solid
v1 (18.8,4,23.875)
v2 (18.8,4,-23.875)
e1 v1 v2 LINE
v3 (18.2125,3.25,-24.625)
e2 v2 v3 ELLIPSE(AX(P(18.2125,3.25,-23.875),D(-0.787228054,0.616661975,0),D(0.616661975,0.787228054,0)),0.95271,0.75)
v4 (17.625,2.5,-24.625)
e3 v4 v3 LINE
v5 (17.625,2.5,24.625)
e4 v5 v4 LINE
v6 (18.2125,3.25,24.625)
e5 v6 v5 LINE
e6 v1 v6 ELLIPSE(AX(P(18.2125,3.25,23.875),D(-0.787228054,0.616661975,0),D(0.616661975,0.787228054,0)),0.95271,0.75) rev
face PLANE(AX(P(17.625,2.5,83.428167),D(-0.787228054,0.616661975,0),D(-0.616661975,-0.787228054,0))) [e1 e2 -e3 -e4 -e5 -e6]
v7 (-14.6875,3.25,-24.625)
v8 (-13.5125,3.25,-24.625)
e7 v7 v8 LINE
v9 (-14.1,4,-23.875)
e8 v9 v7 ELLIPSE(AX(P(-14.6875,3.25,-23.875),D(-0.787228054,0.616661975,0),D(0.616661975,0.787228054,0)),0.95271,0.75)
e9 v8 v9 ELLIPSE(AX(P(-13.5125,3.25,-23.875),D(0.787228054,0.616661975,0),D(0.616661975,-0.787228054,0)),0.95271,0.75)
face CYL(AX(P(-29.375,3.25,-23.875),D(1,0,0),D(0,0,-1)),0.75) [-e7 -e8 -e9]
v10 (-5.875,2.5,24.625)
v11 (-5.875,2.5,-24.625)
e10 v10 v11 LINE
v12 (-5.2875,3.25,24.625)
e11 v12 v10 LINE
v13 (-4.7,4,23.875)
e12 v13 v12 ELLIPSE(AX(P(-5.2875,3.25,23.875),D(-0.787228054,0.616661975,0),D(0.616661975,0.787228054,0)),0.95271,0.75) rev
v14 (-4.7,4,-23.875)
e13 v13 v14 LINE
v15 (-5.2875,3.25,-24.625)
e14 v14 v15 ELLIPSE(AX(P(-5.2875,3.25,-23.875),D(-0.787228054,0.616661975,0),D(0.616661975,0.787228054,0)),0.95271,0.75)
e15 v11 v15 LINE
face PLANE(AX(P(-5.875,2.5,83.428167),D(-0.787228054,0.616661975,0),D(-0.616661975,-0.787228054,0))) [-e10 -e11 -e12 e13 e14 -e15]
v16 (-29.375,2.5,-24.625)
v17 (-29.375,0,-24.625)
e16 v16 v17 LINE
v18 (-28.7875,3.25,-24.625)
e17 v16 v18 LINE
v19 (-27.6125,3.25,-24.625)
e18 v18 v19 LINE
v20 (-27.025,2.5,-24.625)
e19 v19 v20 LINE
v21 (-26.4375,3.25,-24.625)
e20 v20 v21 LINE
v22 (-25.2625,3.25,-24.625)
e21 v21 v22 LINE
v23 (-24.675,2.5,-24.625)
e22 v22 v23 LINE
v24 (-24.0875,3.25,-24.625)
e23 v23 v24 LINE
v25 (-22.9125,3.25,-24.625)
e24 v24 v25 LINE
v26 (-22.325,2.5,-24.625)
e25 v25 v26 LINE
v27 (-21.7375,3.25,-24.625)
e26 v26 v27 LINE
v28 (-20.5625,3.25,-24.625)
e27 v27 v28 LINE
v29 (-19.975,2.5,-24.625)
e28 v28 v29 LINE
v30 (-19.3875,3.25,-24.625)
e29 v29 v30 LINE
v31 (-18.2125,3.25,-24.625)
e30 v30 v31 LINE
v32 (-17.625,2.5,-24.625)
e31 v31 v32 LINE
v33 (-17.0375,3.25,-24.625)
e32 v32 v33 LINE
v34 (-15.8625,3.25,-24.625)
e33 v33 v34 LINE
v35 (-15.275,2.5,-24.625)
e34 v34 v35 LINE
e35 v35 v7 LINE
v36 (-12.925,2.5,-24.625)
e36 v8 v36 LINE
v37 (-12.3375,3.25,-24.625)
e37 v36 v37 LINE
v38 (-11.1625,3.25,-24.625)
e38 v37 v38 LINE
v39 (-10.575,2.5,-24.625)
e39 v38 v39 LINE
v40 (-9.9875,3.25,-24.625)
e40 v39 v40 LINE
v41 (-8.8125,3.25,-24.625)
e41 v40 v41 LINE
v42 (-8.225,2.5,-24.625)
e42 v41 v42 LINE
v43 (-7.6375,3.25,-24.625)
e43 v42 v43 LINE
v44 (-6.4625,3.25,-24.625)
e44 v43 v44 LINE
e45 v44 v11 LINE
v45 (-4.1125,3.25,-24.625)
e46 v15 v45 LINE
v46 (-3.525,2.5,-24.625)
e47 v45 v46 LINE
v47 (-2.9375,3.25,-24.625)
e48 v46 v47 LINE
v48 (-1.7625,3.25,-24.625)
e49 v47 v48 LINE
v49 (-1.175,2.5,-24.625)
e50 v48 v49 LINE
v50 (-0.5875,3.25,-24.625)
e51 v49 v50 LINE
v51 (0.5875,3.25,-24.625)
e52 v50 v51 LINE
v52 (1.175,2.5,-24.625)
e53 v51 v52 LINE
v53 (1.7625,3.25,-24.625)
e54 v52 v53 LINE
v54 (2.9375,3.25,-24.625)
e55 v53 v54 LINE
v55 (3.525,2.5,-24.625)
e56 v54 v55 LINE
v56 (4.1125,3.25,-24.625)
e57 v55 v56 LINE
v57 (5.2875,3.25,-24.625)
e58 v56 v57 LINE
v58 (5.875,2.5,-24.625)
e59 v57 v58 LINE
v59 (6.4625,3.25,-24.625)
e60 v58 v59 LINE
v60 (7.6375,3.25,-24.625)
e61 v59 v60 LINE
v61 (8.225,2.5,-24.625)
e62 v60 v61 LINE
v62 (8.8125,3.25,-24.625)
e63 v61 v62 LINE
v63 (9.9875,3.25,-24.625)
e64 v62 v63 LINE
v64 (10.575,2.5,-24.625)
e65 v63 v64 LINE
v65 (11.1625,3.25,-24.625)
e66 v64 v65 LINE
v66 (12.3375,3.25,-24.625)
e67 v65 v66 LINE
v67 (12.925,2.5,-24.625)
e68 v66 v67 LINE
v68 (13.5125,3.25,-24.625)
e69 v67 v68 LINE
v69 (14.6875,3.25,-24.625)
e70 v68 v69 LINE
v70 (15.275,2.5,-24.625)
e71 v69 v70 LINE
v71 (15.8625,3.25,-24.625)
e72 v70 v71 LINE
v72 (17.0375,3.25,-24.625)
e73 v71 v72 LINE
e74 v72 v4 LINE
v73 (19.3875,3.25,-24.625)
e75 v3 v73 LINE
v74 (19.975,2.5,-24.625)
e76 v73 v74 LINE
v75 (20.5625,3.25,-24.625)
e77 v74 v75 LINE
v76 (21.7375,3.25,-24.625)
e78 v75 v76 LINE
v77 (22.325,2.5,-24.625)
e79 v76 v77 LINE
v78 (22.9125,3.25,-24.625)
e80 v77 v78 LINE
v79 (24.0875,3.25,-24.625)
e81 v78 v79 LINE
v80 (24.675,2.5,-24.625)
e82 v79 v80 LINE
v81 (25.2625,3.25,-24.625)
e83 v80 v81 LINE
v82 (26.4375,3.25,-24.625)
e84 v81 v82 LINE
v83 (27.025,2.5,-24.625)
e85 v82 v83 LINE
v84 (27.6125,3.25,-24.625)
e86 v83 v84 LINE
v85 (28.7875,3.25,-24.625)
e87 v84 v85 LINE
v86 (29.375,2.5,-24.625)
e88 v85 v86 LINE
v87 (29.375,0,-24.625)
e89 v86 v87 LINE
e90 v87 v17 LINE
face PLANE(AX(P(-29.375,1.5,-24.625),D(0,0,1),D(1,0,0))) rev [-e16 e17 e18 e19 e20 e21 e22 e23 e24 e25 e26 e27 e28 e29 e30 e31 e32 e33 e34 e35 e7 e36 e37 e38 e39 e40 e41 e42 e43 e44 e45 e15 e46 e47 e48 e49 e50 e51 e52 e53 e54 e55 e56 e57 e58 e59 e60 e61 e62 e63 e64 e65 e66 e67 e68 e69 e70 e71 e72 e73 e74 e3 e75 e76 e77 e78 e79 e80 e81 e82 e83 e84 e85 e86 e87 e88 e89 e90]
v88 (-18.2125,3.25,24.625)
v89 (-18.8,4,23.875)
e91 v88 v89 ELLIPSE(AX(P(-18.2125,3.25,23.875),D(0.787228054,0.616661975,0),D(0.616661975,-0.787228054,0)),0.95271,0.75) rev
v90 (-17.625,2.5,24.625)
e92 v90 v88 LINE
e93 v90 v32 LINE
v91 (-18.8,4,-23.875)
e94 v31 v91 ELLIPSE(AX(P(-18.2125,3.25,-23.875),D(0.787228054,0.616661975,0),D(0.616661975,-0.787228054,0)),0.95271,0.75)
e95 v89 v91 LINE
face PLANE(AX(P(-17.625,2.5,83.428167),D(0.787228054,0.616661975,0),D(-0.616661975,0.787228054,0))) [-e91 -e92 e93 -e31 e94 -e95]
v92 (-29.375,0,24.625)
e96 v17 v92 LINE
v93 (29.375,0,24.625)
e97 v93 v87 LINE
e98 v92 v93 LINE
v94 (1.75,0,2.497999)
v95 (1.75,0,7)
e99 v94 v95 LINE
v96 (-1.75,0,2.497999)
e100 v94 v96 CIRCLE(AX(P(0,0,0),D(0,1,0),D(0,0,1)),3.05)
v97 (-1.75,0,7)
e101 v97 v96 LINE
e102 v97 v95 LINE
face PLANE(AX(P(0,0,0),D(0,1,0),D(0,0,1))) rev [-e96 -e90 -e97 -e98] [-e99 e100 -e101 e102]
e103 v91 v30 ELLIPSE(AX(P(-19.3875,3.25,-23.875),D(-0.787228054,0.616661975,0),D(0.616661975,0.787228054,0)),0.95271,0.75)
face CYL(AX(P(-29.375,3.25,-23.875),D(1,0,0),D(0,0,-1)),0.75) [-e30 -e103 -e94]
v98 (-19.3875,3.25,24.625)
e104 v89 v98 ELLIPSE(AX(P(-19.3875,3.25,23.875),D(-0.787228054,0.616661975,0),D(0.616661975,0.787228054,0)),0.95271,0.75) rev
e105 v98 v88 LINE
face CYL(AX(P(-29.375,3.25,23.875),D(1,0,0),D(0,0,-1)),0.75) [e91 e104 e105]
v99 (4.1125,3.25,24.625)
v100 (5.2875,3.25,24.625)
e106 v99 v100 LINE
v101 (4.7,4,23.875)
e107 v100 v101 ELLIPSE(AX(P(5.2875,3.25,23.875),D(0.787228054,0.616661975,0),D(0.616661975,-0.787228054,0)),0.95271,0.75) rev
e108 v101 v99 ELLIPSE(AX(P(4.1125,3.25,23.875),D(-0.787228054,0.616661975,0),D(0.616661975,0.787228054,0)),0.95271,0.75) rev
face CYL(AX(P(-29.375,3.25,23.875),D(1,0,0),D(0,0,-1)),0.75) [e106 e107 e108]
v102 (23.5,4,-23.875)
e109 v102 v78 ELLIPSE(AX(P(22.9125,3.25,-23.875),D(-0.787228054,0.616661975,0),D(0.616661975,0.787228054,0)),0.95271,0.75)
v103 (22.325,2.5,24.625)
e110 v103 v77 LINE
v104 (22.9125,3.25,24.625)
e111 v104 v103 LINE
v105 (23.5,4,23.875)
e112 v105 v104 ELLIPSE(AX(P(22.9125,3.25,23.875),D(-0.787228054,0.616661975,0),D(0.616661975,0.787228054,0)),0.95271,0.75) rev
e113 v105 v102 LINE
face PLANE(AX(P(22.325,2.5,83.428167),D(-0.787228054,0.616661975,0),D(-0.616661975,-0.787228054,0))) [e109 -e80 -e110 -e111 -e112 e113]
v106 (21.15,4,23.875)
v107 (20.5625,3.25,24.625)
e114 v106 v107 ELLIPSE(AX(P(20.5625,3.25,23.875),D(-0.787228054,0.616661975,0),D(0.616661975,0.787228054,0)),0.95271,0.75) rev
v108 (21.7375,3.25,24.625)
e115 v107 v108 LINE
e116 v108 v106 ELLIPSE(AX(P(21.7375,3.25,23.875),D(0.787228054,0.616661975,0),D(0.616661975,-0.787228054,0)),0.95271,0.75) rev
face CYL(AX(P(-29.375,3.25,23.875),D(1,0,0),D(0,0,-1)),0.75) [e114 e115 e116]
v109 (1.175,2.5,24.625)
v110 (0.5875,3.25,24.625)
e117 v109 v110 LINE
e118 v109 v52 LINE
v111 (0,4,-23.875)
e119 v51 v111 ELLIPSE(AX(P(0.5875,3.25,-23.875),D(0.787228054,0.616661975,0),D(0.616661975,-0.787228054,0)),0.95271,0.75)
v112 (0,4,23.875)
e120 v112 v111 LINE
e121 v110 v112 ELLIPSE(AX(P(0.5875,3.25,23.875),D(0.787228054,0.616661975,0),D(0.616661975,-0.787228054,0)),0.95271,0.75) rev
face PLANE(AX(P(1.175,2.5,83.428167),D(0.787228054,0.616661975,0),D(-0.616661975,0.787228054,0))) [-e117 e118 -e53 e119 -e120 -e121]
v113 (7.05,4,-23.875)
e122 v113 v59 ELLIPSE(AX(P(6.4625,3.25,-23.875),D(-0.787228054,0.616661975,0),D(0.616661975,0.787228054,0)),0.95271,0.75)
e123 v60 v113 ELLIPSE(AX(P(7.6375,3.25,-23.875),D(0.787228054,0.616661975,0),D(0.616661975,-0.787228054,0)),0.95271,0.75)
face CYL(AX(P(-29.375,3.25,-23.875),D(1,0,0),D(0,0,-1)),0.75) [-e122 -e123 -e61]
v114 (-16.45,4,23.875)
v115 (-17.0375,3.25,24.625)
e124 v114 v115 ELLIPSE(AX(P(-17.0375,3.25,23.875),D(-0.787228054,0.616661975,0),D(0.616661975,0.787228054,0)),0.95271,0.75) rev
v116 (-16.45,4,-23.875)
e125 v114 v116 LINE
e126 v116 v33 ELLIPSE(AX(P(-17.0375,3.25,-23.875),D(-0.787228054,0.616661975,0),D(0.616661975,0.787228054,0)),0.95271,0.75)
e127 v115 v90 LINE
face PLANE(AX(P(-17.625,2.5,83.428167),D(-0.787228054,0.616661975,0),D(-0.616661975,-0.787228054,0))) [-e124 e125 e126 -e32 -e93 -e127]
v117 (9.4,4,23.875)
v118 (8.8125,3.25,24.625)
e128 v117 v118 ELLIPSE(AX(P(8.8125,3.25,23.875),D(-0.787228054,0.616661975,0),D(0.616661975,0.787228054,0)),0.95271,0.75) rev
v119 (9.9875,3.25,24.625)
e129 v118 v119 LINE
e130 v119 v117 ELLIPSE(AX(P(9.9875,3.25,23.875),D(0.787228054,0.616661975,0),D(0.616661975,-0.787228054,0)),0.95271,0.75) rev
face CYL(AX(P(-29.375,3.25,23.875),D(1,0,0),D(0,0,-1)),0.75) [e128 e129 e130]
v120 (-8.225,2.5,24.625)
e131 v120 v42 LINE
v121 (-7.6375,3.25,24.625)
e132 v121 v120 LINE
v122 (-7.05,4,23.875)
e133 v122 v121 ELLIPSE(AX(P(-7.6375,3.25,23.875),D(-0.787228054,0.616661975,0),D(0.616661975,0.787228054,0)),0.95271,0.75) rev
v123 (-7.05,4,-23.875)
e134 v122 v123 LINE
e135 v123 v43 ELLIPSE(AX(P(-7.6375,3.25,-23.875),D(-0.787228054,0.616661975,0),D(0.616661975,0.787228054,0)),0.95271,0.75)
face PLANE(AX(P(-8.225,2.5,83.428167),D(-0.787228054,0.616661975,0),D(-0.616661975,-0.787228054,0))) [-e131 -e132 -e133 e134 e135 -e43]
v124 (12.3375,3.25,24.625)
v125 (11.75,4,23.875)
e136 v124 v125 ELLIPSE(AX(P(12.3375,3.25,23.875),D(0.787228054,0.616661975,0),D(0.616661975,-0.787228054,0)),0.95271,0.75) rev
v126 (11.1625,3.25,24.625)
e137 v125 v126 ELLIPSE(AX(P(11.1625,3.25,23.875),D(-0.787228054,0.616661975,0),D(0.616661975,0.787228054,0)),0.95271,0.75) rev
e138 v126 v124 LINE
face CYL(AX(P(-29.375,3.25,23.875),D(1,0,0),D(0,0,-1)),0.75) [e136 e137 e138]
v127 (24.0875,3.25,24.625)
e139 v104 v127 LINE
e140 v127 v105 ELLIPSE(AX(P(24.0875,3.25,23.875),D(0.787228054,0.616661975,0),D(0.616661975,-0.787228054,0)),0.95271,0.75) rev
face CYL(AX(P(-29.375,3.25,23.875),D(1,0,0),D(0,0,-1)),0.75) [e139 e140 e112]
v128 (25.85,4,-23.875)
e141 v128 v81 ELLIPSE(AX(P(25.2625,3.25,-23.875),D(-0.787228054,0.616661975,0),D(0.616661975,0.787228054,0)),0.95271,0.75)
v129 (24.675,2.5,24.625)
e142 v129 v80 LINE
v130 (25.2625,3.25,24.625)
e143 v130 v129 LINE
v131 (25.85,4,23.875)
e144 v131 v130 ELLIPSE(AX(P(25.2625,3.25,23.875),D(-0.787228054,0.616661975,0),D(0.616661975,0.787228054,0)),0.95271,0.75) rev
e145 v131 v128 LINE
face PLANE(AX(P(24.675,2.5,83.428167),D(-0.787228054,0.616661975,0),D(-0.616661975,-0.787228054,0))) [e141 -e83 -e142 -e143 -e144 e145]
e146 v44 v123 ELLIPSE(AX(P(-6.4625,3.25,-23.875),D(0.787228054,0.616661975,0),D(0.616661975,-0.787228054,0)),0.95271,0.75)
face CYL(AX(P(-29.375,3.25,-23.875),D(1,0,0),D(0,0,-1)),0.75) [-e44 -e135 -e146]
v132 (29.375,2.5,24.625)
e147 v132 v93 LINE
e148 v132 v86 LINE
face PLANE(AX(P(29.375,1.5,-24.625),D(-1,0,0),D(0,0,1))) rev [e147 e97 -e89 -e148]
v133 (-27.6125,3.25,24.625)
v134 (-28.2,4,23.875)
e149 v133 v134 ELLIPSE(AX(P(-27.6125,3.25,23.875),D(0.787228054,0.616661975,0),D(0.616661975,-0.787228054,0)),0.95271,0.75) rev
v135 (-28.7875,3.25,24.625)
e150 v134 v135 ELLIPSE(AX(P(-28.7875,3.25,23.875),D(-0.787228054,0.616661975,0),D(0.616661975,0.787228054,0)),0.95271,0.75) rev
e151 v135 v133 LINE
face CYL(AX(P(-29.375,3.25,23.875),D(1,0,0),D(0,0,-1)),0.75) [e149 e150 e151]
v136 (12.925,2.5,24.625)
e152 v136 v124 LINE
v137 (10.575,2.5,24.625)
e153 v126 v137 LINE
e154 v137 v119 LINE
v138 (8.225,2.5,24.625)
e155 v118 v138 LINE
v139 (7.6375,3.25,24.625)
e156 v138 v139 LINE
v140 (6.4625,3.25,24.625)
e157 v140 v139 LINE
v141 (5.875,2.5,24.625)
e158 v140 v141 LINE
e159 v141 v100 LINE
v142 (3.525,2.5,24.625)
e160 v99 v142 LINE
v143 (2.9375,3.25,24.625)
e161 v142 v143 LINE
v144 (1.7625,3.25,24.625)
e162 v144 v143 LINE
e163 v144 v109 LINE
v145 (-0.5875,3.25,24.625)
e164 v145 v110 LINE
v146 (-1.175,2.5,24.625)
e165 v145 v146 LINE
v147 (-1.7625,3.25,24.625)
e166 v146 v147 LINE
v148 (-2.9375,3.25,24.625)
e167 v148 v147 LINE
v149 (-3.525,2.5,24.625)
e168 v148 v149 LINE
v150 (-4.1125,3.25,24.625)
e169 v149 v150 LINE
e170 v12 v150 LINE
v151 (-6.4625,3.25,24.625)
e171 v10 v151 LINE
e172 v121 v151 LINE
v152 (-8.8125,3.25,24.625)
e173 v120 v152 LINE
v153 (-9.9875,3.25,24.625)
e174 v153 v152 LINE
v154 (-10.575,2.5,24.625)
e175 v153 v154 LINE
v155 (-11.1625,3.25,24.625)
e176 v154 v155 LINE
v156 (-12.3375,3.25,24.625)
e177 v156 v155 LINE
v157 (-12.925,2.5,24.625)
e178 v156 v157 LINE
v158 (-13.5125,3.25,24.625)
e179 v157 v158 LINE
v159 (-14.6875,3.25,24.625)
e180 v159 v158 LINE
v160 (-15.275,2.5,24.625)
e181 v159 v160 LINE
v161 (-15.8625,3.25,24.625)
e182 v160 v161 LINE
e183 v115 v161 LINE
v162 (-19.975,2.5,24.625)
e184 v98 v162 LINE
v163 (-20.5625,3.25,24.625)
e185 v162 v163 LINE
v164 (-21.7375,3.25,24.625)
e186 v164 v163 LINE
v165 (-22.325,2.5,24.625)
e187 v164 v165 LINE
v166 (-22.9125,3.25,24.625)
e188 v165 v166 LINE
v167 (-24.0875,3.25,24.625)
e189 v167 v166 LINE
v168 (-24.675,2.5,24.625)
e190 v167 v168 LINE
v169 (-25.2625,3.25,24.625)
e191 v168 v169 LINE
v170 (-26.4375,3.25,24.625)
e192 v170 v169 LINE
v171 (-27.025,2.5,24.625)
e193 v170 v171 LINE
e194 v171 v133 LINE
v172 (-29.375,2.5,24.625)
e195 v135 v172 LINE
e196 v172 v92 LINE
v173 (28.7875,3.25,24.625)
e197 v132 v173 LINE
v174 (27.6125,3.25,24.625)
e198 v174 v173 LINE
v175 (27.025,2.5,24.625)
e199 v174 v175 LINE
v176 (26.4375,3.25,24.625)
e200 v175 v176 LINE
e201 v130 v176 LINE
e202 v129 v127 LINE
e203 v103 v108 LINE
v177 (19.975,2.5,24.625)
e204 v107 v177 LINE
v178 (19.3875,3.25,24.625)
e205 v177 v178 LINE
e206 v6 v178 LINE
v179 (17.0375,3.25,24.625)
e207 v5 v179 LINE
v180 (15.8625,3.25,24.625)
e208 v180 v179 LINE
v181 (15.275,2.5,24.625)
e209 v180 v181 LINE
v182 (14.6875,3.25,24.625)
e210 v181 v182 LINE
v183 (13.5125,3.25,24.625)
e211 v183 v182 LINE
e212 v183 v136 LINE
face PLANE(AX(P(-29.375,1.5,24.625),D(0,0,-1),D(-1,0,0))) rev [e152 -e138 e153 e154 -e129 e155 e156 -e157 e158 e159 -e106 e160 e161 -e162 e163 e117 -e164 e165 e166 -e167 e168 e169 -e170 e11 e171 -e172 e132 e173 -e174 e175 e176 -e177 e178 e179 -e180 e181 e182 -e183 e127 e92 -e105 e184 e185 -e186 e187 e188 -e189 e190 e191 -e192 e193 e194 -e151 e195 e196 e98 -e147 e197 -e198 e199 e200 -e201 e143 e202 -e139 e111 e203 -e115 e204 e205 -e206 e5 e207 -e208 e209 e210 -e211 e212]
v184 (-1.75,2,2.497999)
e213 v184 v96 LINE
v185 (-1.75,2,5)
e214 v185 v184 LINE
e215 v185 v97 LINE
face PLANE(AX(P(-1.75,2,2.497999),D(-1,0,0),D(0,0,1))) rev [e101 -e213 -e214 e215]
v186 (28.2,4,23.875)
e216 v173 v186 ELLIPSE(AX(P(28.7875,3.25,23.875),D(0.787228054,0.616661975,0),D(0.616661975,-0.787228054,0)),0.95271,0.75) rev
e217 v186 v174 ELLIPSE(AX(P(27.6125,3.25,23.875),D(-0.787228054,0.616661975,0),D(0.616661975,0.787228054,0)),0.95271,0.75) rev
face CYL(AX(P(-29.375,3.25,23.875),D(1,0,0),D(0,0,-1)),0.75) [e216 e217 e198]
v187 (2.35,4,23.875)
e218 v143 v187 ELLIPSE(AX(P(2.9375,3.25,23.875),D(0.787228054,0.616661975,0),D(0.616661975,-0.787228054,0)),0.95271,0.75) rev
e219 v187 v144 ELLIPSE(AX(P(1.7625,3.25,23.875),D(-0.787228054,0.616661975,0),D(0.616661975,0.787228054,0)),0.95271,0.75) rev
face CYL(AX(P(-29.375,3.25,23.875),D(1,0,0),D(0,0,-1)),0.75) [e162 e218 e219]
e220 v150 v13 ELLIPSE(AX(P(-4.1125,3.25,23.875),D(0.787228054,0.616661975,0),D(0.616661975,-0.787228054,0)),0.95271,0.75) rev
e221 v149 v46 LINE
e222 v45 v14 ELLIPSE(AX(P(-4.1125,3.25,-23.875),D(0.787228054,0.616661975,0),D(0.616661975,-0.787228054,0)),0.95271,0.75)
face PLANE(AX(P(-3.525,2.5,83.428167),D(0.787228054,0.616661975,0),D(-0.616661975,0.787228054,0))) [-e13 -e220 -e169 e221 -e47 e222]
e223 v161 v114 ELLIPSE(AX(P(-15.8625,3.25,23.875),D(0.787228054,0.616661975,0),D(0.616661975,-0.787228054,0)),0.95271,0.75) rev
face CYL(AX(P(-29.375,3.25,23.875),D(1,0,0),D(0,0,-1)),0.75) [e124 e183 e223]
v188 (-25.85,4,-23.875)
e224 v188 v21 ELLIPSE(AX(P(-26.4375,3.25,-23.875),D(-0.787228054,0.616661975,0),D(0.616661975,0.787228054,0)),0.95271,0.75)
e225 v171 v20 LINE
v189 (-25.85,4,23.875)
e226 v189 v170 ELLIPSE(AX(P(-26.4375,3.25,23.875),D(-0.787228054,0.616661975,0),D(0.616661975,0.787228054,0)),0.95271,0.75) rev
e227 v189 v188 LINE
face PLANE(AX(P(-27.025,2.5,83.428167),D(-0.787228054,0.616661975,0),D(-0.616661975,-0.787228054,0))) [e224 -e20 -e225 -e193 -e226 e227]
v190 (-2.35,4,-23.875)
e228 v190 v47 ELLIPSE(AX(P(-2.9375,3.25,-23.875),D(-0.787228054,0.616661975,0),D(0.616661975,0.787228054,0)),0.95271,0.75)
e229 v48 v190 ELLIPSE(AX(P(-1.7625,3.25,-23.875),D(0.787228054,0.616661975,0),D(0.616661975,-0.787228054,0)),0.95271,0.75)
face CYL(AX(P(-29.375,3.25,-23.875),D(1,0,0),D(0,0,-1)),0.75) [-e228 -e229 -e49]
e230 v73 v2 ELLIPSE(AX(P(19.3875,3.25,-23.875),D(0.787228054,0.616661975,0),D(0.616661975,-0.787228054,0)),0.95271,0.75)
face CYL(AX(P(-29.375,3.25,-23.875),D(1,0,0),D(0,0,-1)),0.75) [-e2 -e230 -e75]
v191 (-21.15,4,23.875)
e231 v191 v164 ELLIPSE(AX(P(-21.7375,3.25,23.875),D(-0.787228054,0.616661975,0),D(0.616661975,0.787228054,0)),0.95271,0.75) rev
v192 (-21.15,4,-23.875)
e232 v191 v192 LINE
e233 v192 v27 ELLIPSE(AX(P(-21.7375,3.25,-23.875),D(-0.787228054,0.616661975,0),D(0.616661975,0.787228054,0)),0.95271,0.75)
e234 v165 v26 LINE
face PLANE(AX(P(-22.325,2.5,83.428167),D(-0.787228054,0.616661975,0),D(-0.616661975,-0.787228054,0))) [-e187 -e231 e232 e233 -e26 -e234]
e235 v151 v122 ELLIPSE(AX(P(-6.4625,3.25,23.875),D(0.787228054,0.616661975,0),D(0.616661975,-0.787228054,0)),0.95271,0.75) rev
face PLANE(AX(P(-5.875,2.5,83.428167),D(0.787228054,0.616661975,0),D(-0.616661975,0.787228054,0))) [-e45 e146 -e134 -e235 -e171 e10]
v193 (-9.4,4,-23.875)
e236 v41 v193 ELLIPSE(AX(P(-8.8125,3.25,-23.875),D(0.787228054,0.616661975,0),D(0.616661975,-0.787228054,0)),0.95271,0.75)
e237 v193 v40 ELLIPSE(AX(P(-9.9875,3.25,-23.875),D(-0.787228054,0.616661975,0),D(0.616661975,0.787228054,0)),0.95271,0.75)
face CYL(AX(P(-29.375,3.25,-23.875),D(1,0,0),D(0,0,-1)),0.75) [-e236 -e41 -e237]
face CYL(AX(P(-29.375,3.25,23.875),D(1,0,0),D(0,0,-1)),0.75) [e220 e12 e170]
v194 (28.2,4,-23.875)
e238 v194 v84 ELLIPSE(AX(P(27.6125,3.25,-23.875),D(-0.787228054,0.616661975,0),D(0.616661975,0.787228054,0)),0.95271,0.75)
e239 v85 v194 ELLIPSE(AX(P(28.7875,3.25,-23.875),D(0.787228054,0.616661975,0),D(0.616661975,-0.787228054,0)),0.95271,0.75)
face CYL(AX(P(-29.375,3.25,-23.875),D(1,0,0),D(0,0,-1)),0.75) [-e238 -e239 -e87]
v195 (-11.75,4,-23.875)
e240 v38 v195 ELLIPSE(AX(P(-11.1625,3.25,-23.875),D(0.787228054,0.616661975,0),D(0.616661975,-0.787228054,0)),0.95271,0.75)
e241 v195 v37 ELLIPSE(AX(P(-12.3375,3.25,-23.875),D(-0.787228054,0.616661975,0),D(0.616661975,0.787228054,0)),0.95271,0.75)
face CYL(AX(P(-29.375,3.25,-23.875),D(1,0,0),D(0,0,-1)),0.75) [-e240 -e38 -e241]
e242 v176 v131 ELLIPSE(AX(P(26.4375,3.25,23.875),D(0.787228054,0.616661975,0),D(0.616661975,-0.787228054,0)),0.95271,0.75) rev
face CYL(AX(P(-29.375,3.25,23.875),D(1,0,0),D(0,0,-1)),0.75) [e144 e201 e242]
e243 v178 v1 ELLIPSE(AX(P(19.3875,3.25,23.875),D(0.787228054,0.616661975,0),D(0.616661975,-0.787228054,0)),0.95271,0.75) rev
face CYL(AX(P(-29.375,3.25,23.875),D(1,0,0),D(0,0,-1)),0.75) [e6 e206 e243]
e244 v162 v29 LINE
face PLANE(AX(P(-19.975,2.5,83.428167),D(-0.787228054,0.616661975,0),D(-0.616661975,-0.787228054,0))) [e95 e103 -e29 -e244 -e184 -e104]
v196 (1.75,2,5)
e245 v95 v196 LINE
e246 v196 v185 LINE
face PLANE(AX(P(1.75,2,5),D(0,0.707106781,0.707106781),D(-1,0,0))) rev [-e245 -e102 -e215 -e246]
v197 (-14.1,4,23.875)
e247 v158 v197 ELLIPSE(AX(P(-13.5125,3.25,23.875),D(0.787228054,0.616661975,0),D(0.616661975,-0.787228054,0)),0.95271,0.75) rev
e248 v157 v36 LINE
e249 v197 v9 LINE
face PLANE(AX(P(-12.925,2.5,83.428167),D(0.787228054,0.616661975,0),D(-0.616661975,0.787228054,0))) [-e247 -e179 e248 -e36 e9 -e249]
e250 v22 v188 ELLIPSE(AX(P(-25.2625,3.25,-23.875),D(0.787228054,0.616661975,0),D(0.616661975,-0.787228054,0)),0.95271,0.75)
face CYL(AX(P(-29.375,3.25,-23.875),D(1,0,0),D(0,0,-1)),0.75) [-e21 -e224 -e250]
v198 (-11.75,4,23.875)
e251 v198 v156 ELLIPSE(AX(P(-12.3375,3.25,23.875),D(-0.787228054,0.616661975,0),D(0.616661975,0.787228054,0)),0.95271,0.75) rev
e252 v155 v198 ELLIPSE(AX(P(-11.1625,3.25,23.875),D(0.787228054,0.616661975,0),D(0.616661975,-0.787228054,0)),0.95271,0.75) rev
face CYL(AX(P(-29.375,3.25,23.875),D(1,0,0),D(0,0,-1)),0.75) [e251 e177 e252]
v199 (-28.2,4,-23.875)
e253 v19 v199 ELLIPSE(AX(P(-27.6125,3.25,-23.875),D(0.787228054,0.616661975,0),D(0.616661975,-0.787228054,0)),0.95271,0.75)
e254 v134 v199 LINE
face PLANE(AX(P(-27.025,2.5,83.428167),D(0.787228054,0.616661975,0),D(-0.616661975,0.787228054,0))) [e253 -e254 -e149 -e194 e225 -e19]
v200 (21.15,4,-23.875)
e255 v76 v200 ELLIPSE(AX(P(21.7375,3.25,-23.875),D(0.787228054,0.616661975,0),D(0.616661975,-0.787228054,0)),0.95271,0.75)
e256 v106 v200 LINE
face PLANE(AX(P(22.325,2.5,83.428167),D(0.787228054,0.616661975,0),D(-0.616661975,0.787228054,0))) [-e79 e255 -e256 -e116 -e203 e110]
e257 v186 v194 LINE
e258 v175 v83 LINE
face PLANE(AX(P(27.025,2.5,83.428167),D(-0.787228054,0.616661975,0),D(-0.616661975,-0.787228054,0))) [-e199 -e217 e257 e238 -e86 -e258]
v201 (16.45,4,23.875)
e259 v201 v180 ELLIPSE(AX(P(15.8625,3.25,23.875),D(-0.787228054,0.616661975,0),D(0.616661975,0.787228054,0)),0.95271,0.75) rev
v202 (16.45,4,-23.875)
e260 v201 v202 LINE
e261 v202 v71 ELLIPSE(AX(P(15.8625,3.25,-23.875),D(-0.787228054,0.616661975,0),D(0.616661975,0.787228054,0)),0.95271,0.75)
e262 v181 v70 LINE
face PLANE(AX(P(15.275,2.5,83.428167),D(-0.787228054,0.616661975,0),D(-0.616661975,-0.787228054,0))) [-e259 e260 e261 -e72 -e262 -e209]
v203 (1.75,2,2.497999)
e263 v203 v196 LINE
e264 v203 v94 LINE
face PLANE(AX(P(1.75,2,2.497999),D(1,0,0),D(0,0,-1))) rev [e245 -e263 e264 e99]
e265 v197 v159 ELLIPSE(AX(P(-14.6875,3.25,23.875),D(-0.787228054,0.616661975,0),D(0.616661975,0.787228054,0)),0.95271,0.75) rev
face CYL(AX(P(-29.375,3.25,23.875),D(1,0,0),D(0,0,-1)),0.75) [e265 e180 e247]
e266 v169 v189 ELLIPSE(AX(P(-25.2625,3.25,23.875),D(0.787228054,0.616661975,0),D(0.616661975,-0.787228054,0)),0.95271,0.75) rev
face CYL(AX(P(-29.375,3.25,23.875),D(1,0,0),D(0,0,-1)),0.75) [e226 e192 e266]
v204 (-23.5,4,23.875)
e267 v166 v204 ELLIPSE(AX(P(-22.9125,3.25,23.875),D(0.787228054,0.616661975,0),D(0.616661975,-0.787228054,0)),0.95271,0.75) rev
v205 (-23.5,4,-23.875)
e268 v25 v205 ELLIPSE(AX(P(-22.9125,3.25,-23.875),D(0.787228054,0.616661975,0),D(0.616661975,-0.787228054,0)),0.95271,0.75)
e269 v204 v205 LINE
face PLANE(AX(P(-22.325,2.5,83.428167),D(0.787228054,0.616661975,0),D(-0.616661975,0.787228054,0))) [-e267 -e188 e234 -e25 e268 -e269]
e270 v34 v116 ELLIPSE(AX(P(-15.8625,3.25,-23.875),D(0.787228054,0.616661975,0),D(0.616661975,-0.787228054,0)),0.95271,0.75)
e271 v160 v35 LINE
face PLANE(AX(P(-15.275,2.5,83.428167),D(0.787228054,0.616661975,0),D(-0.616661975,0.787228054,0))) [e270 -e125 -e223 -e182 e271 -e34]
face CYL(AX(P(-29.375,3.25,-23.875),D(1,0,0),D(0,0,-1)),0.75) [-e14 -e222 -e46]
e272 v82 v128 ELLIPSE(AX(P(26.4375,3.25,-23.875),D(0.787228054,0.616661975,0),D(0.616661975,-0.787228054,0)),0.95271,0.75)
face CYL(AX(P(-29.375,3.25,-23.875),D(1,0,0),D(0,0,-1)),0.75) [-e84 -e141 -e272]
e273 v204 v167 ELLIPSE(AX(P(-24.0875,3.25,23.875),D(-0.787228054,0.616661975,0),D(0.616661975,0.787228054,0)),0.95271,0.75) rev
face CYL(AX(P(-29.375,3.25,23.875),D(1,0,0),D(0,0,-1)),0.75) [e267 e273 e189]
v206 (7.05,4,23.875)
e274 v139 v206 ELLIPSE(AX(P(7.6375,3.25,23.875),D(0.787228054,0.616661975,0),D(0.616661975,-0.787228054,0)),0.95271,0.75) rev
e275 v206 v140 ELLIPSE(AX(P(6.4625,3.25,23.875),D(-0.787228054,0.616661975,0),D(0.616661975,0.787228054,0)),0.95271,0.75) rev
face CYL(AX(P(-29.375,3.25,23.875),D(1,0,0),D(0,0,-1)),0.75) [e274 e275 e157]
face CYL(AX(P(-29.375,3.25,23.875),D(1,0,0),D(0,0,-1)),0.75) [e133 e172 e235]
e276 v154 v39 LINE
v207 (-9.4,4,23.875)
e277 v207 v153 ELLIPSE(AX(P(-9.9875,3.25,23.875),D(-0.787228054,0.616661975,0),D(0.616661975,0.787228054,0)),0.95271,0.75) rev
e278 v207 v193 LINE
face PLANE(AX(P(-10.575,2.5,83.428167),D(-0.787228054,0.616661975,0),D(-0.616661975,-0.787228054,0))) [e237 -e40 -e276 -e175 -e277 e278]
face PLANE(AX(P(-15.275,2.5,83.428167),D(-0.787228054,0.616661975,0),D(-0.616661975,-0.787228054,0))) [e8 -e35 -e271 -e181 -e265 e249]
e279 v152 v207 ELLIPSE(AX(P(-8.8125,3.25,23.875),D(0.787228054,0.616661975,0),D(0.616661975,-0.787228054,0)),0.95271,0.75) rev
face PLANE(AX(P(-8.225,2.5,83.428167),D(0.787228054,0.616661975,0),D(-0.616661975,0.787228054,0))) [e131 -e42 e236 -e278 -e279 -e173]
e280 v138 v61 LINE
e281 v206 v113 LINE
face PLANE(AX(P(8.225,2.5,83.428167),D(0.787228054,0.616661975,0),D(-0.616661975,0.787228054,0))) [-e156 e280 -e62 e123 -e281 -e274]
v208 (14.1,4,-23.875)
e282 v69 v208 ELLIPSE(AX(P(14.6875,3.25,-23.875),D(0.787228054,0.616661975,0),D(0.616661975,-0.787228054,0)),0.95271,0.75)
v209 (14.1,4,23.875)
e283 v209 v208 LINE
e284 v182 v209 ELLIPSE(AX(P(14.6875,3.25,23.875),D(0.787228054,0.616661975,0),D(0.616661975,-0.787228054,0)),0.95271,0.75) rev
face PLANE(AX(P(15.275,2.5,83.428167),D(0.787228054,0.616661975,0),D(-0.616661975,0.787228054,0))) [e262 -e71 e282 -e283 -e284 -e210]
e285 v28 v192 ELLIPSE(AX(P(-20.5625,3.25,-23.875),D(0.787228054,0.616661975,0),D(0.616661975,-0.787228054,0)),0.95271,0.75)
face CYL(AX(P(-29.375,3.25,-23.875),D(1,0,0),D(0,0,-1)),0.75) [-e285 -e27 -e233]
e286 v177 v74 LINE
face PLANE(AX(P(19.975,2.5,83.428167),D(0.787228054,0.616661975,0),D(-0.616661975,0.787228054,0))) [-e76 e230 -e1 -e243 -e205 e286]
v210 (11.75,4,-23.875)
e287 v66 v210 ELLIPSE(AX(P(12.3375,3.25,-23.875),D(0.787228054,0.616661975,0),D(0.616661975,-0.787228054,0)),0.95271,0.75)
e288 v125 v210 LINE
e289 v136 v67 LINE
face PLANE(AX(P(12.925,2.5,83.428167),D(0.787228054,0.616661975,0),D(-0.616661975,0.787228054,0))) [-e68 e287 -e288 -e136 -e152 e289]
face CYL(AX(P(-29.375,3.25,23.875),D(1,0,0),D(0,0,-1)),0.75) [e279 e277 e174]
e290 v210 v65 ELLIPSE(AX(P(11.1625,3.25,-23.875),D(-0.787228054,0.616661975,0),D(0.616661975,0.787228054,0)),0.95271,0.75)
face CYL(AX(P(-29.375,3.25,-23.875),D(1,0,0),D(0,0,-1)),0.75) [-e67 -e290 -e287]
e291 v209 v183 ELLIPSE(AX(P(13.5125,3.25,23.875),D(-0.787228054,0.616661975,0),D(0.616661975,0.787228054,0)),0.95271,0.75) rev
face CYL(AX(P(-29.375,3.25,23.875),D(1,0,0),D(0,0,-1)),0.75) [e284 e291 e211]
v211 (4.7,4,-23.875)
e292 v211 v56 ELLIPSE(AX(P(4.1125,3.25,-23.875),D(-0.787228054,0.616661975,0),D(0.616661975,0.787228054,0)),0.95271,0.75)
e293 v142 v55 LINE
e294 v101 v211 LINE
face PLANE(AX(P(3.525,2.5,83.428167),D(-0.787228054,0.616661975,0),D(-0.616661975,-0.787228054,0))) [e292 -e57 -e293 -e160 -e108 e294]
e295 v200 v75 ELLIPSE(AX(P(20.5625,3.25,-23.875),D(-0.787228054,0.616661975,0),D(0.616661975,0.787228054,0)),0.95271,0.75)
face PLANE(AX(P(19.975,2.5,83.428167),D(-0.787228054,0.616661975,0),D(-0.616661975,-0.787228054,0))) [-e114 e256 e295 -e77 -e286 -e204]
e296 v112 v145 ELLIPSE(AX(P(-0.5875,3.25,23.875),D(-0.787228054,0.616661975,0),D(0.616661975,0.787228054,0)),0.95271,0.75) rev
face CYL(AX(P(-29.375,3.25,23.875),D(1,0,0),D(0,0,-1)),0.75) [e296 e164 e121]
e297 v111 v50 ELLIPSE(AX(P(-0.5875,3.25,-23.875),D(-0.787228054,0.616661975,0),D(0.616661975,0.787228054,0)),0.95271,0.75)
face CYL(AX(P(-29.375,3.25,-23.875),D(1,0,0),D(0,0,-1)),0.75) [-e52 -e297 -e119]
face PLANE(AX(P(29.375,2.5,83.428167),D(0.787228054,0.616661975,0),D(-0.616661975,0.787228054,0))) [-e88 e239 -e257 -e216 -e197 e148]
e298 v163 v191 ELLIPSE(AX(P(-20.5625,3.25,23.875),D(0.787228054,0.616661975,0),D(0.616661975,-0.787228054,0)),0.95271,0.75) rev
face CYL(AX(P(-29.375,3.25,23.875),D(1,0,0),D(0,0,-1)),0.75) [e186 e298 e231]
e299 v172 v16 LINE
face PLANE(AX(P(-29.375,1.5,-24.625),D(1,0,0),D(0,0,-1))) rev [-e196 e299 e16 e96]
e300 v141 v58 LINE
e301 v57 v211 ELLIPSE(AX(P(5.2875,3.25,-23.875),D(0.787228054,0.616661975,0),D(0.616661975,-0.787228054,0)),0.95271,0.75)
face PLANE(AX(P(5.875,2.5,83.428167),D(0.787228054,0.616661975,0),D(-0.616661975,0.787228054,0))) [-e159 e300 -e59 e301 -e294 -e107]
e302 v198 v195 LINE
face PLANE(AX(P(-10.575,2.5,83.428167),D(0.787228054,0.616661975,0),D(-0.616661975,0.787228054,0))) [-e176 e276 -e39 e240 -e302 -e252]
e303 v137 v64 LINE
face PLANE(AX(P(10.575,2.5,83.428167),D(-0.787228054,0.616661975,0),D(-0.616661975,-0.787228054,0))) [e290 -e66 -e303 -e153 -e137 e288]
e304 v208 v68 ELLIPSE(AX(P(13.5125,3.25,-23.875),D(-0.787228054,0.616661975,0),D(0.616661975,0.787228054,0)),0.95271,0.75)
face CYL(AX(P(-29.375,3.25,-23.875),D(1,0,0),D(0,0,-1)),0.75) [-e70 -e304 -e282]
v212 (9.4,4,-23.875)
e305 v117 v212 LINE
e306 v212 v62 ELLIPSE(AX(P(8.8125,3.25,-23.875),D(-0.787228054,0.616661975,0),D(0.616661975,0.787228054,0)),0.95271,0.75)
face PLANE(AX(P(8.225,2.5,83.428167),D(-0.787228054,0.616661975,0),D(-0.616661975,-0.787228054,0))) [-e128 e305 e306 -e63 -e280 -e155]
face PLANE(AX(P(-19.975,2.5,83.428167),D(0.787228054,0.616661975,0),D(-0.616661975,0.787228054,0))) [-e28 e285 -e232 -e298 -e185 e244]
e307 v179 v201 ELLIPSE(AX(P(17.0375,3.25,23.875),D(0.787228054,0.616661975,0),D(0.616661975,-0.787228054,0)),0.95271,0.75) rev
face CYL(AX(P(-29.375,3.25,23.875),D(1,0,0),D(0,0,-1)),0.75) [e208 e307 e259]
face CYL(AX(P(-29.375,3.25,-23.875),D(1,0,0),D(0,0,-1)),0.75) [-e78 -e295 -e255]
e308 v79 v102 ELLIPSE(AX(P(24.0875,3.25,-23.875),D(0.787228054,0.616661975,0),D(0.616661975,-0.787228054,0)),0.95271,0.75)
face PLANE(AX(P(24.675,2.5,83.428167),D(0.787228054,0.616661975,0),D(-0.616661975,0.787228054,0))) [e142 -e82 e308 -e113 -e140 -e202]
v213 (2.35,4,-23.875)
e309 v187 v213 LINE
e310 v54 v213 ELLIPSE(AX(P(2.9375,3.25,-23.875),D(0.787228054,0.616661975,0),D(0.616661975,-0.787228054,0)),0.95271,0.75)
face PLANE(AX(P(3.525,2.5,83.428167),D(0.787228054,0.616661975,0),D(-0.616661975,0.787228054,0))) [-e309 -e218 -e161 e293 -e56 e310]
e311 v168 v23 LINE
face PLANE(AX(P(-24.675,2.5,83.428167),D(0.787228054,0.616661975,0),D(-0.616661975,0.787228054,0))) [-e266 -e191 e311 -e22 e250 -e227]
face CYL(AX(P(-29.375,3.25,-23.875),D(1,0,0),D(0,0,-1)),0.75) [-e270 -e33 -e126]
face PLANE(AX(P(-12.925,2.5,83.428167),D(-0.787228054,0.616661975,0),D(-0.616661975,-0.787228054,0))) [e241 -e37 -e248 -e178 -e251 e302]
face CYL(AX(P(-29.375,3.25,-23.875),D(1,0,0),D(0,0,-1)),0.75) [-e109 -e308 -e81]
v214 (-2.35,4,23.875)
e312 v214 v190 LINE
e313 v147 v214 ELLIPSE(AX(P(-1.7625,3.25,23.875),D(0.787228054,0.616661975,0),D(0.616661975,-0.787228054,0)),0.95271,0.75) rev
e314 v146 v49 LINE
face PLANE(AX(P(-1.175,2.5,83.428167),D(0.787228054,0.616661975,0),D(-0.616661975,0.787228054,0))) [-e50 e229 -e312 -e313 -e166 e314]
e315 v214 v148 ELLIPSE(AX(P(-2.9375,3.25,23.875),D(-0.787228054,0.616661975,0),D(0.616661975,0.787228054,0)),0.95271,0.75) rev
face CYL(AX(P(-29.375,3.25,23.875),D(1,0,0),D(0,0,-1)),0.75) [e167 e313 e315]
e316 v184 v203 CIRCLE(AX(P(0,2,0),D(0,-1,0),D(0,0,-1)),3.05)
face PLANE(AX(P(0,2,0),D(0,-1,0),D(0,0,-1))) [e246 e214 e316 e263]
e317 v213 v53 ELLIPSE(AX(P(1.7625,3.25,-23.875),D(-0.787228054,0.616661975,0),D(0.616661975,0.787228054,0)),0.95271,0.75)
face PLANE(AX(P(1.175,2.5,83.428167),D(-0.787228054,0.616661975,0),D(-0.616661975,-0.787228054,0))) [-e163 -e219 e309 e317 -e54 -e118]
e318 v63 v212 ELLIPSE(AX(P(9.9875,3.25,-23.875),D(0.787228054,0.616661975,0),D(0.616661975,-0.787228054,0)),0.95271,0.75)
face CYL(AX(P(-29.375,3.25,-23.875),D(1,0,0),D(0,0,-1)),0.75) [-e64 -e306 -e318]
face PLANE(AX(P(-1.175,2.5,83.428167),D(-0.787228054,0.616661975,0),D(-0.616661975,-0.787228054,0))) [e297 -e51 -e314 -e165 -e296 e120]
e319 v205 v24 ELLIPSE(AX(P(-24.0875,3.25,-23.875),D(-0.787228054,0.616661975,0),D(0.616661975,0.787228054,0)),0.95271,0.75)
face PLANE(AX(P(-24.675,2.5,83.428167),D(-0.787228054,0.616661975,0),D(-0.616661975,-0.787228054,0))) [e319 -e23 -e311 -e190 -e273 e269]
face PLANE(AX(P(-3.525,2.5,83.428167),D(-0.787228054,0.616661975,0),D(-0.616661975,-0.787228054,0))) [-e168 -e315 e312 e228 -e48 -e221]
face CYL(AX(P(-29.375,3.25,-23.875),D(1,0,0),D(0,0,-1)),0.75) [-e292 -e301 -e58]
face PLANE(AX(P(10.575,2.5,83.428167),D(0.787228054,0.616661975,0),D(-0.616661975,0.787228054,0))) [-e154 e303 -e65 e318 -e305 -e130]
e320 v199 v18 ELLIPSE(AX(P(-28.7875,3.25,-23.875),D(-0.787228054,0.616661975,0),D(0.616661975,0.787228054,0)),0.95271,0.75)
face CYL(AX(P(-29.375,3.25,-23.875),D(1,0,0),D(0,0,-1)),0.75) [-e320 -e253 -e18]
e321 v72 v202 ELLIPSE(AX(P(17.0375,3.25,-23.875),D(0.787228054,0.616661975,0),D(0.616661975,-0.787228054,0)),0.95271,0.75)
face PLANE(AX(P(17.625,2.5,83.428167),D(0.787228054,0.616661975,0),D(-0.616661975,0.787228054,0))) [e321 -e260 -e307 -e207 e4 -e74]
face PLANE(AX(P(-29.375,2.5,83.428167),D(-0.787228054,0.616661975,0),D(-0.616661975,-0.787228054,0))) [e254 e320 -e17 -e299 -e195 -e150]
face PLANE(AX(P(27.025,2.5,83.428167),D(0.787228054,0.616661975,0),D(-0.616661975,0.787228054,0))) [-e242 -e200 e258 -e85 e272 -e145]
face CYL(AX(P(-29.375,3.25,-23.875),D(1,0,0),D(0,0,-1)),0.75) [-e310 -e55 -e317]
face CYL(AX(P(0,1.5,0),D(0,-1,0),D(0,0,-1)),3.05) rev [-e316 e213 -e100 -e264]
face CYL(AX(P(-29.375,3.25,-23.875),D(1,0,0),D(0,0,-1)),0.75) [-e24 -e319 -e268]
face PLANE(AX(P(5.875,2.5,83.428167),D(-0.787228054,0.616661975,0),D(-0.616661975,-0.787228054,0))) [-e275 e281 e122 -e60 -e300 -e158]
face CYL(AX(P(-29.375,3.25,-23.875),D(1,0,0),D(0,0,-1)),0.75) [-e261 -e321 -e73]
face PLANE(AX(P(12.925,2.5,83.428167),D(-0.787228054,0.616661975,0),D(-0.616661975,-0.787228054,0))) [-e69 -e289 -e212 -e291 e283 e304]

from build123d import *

# Parameters (mm, degrees)
SKETCH1_W           = 58.75
SKETCH1_H           = 49.25
SKETCH1_R           = 3.05
BOSS_EXTRUDE1_DEPTH = 1.5
BOSS_EXTRUDE2_DEPTH = 49.25
CUT_EXTRUDE1_DEPTH  = 2
CUT_EXTRUDE3_DEPTH  = 64.827526389
CHAMFER3_SIZE       = 2


with BuildPart() as part:
    # Sketch1 → Boss-Extrude1 (new body)
    with BuildSketch(Plane(origin=(0, 0, 0), x_dir=(1, 0, 0), z_dir=(0, 1, 0))):
        Rectangle(SKETCH1_W, SKETCH1_H)
        with Locations(Location((0, 0, 0), (0, 0, 270))):
            Circle(SKETCH1_R, mode=Mode.SUBTRACT)
    extrude(amount=BOSS_EXTRUDE1_DEPTH)

    # Sketch2 → Boss-Extrude2 (add)
    with BuildSketch(Plane(origin=(0, 0, -24.625), x_dir=(-1, 0, 0), z_dir=(0, 0, -1))):
        Polygon((-29.375, 1.5), (29.375, 1.5), (29.375, 2.5), (28.2, 4), (27.025, 2.5), (25.85, 4), (24.675, 2.5), (23.5, 4), (22.325, 2.5), (21.15, 4), (19.975, 2.5), (18.8, 4), (17.625, 2.5), (16.45, 4), (15.275, 2.5), (14.1, 4), (12.925, 2.5), (11.75, 4), (10.575, 2.5), (9.4, 4), (8.225, 2.5), (7.05, 4), (5.875, 2.5), (4.7, 4), (3.525, 2.5), (2.35, 4), (1.175, 2.5), (0, 4), (-1.175, 2.5), (-2.35, 4), (-3.525, 2.5), (-4.7, 4), (-5.875, 2.5), (-7.05, 4), (-8.225, 2.5), (-9.4, 4), (-10.575, 2.5), (-11.75, 4), (-12.925, 2.5), (-14.1, 4), (-15.275, 2.5), (-16.45, 4), (-17.625, 2.5), (-18.8, 4), (-19.975, 2.5), (-21.15, 4), (-22.325, 2.5), (-23.5, 4), (-24.675, 2.5), (-25.85, 4), (-27.025, 2.5), (-28.2, 4), (-29.375, 2.5), align=None)
    extrude(amount=-BOSS_EXTRUDE2_DEPTH)

    # Sketch3 → Cut-Extrude1 (cut)
    with BuildSketch(Plane(origin=(0, 0, 0), x_dir=(-1, 0, 0), z_dir=(0, -1, 0))):
        with BuildLine():
            Line((-1.75, -2.497999199), (-1.75, -5))
            Line((-1.75, -5), (1.75, -5))
            Line((1.75, -5), (1.75, -2.497999199))
            ThreePointArc((1.75, -2.497999199), (0, 3.05), (-1.75, -2.497999199))
        make_face()
    extrude(amount=-CUT_EXTRUDE1_DEPTH, mode=Mode.SUBTRACT)

    # Sketch4 → Cut-Extrude3 (cut, through all)
    with BuildSketch(Plane(origin=(29.375, 0, 0), x_dir=(0, 0, -1), z_dir=(1, 0, 0))):
        with BuildLine():
            Line((-23.875, 4), (-24.625, 4))
            Line((-24.625, 4), (-24.625, 3.25))
            ThreePointArc((-24.625, 3.25), (-24.405330086, 3.780330086), (-23.875, 4))
        make_face()
    cut_extrude3 = extrude(amount=-CUT_EXTRUDE3_DEPTH, mode=Mode.SUBTRACT)

    # Mirror1: Cut-Extrude3 across plane
    add(cut_extrude3.mirror(Plane.XY), mode=Mode.SUBTRACT)

    # Chamfer3
    chamfer3_edges = [part.edges().sort_by_distance(p)[0] for p in [
        (0, 0, 5),
    ]]
    chamfer(chamfer3_edges, length=CHAMFER3_SIZE - 0.0001)  # a hair under: the kernel refuses the full size


solid = part.part
